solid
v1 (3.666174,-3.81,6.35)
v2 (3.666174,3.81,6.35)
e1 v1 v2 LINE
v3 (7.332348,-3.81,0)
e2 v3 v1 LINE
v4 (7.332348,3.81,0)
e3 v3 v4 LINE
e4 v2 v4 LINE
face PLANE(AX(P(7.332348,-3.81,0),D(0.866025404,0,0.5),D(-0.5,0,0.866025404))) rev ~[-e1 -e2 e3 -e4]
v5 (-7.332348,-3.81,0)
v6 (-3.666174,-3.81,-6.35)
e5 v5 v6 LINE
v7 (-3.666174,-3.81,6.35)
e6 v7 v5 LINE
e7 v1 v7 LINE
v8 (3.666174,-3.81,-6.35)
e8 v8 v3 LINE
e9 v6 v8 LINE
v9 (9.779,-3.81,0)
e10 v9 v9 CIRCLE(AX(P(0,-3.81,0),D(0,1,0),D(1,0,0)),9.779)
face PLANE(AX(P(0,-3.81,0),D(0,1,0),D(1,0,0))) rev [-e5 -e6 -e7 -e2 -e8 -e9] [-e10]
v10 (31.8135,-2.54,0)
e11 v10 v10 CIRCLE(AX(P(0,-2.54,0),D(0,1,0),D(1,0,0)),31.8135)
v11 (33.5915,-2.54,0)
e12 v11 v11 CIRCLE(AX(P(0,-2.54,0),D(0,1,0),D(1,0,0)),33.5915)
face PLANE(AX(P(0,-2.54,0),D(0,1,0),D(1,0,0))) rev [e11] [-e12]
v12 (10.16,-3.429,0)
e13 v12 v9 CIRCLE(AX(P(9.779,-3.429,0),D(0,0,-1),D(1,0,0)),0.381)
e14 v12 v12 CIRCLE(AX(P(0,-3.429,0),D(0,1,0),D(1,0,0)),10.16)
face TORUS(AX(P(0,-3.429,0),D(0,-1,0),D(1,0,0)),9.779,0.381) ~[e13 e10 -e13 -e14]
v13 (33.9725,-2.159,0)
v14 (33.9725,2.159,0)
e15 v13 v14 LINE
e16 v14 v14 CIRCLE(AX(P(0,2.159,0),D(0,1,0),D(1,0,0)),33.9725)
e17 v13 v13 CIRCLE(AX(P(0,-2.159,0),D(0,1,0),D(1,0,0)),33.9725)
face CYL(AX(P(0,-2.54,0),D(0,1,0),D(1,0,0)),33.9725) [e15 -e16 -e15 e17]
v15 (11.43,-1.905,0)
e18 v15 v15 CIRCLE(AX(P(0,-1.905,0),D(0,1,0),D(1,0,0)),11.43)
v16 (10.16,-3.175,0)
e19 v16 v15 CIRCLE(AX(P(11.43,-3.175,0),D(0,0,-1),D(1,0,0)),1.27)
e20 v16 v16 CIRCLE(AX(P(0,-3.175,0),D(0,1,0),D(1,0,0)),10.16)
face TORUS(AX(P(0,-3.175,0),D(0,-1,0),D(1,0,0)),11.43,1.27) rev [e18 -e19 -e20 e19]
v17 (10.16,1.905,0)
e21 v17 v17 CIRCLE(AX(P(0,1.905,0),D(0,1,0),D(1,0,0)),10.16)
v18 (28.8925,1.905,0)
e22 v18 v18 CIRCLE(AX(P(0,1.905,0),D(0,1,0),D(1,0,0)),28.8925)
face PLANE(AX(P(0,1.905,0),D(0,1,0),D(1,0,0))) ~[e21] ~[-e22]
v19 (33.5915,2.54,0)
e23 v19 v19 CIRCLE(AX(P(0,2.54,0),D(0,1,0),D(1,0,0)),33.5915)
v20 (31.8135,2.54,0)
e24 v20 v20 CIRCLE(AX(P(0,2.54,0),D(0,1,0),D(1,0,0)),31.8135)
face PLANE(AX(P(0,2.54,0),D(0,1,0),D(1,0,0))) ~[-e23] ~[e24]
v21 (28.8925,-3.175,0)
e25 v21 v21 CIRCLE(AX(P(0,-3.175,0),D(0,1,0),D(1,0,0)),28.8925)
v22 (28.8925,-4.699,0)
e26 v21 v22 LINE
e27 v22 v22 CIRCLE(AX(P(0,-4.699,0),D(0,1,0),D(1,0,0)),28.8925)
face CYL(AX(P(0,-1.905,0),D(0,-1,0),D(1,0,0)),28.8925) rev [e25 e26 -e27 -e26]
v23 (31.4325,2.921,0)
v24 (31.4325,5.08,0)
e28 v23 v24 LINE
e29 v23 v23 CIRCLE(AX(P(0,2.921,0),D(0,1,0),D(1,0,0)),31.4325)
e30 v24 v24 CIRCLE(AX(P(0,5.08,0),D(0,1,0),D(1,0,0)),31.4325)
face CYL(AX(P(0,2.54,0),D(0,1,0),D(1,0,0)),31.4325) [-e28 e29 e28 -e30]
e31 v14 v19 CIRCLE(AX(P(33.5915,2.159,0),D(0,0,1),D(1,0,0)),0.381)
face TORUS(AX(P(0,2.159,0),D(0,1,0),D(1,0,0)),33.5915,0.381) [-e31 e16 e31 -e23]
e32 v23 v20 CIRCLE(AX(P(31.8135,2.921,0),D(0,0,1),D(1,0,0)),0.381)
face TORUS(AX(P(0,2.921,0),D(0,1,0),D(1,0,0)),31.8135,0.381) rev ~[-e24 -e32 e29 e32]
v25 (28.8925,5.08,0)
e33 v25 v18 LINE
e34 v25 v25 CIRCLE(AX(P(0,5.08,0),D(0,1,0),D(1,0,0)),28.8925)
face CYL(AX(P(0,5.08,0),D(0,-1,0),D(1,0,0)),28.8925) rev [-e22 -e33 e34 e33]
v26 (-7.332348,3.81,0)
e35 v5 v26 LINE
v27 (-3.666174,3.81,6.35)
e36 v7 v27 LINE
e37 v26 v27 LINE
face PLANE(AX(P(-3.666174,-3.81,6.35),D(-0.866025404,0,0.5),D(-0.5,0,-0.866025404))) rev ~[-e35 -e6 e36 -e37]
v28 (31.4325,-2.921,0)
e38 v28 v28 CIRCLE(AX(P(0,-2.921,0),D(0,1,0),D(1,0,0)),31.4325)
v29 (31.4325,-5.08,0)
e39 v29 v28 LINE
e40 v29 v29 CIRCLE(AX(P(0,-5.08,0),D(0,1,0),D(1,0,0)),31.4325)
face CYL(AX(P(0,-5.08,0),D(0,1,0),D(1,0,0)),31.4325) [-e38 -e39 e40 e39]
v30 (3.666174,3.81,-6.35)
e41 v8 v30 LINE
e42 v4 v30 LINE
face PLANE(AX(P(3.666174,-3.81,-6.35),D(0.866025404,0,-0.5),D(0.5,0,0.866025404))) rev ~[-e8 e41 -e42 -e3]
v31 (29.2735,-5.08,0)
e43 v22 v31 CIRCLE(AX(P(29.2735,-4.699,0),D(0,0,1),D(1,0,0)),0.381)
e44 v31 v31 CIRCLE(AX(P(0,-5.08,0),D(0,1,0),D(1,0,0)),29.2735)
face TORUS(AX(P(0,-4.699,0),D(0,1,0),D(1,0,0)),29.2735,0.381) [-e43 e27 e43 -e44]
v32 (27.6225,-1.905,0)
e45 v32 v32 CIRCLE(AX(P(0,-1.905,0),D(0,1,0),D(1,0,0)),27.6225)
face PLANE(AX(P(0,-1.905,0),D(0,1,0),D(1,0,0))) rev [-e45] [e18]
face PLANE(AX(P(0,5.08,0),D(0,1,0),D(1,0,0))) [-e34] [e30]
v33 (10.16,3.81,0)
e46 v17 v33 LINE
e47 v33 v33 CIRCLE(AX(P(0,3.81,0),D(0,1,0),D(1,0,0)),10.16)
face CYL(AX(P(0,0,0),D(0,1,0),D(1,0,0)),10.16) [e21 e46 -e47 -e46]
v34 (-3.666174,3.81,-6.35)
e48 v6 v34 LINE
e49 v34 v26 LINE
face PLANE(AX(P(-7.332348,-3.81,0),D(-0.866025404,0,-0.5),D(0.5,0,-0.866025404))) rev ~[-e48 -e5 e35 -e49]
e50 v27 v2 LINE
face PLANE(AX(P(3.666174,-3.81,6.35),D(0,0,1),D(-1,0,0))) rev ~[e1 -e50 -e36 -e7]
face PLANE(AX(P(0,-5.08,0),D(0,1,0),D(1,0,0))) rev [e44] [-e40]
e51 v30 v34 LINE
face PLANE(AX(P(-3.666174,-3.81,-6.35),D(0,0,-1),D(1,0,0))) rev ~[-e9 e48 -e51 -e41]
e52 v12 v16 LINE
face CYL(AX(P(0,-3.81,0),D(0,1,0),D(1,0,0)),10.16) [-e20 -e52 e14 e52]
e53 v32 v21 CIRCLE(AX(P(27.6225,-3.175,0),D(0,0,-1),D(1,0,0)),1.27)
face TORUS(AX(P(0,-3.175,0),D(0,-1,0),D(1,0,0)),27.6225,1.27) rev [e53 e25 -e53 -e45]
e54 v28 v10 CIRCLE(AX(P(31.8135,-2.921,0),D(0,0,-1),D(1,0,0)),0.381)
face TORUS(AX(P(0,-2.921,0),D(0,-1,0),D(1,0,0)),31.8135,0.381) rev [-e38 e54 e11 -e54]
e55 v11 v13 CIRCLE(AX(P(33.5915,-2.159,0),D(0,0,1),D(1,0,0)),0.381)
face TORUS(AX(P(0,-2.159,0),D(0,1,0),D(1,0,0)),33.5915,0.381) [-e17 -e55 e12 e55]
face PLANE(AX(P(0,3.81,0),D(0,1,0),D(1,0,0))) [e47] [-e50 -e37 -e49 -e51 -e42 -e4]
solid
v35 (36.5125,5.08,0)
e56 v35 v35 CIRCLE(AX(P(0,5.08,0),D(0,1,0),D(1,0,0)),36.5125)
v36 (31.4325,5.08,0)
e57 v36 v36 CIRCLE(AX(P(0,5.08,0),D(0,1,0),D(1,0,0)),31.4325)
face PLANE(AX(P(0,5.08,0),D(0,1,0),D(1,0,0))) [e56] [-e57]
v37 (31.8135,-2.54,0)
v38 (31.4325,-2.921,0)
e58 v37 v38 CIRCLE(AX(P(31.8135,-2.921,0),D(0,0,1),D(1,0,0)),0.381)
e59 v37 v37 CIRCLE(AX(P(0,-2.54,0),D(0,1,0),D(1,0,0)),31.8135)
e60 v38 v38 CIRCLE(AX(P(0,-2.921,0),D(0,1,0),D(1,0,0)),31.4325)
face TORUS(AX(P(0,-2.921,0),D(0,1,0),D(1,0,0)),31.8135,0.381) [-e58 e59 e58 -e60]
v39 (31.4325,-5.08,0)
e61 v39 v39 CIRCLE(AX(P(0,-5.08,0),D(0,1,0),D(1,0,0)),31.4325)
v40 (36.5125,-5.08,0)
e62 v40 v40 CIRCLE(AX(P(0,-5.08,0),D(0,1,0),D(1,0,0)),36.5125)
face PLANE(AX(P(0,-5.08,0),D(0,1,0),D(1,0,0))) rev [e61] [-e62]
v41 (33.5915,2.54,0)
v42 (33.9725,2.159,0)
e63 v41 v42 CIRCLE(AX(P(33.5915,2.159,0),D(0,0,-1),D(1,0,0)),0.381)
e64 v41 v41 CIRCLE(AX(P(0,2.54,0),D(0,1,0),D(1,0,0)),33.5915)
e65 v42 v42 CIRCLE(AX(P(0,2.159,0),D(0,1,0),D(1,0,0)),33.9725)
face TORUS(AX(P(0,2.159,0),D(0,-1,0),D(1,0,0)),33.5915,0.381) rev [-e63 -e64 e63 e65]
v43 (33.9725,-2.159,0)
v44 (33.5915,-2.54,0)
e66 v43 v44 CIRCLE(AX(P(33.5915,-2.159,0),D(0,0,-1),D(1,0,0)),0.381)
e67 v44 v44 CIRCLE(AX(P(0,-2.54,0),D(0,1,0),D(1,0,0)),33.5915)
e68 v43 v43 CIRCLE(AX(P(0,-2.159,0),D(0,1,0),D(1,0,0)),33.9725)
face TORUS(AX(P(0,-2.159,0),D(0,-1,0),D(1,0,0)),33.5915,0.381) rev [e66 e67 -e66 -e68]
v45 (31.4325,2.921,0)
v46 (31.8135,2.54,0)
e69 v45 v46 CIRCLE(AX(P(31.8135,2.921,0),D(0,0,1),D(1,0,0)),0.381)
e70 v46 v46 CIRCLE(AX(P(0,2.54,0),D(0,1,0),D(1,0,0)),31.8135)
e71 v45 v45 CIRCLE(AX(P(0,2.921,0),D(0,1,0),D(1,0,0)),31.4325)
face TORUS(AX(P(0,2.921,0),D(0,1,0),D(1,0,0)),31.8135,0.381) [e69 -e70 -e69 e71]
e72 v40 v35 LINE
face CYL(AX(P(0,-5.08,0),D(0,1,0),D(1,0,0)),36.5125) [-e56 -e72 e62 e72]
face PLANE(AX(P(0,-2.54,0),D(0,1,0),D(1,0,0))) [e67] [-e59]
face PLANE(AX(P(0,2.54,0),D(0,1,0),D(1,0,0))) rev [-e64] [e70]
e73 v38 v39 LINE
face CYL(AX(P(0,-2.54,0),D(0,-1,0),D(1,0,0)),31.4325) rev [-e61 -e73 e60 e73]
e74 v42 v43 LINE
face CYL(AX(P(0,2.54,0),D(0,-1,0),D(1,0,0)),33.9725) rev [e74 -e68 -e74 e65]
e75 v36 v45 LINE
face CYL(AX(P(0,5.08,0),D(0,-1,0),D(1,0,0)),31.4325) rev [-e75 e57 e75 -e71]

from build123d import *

# Parameters (mm, degrees)
F0_W     = 18.7325
F0_H     = 1.905
F0_W_2   = 2.54
F0_H_2   = 2.54
F3_DEPTH = 8.891
F8_R     = 1.27
F9_R     = 0.381
F10_R    = 0.381
F11_R    = 0.381


# Not quite as in the source:
# - a variable given as a bare number and used for a length is read in inches; the dataset says mm whatever the document's units were


with BuildPart() as f1:
    # F0 (on Top) → F1 (revolve)
    with BuildSketch(Plane.XY):
        Polygon((0, 3.81), (0, 0), (10.16, 0), (10.16, 1.905), (10.16, 3.81), align=None)
        with Locations((19.52625, 0.9525)):
            Rectangle(F0_W, F0_H)
        Polygon((10.16, 0), (0, 0), (0, -3.81), (10.16, -3.81), (10.16, -1.905), align=None)
        with Locations((19.52625, -0.9525)):
            Rectangle(F0_W, F0_H)
        with Locations((32.7025, -1.27)):
            Rectangle(F0_W_2, F0_H_2)
        with Locations((32.7025, 1.27)):
            Rectangle(F0_W_2, F0_H_2)
        Polygon((28.8925, 1.905), (28.8925, 0), (31.4325, 0), (31.4325, 2.54), (31.4325, 5.08), (28.8925, 5.08), align=None)
        Polygon((31.4325, 0), (28.8925, 0), (28.8925, -1.905), (28.8925, -5.08), (31.4325, -5.08), (31.4325, -2.54), align=None)
    revolve(axis=Axis((0, 1.905, 0), (0, 1, 0)))

    # F2 (on face) → F3 (cut, through all)
    with BuildSketch(Plane.XZ.offset(3.81)):
        Polygon((3.6661742094, 6.35), (-3.6661742094, 6.35), (-7.3323484187, 0), (-3.6661742094, -6.35), (3.6661742094, -6.35), (7.3323484187, 0), align=None)
    extrude(amount=-F3_DEPTH, mode=Mode.SUBTRACT)

    # F8
    f8_edges = [f1.edges().sort_by_distance(p)[0] for p in [
        (-28.8925, -1.905, 0),
        (-10.16, -1.905, 0),
    ]]
    fillet(f8_edges, radius=F8_R)

    # F9
    f9_edges = [f1.edges().sort_by_distance(p)[0] for p in [
        (-28.8925, -5.08, 0),
        (-10.16, -3.81, 0),
    ]]
    fillet(f9_edges, radius=F9_R)

    # F10
    f10_edges = [f1.edges().sort_by_distance(p)[0] for p in [
        (-31.4325, -2.54, 0),
        (-33.9725, -2.54, 0),
        (-31.4325, 2.54, 0),
        (-33.9725, 2.54, 0),
    ]]
    fillet(f10_edges, radius=F10_R)


with BuildPart() as f5:
    # F4 (on Top) → F5 (revolve)
    with BuildSketch(Plane.XY):
        Polygon((31.4325, 5.08), (31.4325, 2.54), (33.9725, 2.54), (33.9725, 0), (33.9725, -2.54), (31.4325, -2.54), (31.4325, -5.08), (36.5125, -5.08), (36.5125, 5.08), align=None)
    revolve(axis=Axis((0, 1.905, 0), (0, 1, 0)))

    # F11
    f11_edges = [f5.edges().sort_by_distance(p)[0] for p in [
        (-33.9725, 2.54, 0),
        (-31.4325, 2.54, 0),
        (-31.4325, -2.54, 0),
        (-33.9725, -2.54, 0),
    ]]
    fillet(f11_edges, radius=F11_R)


solid = Compound([f1.part, f5.part])
